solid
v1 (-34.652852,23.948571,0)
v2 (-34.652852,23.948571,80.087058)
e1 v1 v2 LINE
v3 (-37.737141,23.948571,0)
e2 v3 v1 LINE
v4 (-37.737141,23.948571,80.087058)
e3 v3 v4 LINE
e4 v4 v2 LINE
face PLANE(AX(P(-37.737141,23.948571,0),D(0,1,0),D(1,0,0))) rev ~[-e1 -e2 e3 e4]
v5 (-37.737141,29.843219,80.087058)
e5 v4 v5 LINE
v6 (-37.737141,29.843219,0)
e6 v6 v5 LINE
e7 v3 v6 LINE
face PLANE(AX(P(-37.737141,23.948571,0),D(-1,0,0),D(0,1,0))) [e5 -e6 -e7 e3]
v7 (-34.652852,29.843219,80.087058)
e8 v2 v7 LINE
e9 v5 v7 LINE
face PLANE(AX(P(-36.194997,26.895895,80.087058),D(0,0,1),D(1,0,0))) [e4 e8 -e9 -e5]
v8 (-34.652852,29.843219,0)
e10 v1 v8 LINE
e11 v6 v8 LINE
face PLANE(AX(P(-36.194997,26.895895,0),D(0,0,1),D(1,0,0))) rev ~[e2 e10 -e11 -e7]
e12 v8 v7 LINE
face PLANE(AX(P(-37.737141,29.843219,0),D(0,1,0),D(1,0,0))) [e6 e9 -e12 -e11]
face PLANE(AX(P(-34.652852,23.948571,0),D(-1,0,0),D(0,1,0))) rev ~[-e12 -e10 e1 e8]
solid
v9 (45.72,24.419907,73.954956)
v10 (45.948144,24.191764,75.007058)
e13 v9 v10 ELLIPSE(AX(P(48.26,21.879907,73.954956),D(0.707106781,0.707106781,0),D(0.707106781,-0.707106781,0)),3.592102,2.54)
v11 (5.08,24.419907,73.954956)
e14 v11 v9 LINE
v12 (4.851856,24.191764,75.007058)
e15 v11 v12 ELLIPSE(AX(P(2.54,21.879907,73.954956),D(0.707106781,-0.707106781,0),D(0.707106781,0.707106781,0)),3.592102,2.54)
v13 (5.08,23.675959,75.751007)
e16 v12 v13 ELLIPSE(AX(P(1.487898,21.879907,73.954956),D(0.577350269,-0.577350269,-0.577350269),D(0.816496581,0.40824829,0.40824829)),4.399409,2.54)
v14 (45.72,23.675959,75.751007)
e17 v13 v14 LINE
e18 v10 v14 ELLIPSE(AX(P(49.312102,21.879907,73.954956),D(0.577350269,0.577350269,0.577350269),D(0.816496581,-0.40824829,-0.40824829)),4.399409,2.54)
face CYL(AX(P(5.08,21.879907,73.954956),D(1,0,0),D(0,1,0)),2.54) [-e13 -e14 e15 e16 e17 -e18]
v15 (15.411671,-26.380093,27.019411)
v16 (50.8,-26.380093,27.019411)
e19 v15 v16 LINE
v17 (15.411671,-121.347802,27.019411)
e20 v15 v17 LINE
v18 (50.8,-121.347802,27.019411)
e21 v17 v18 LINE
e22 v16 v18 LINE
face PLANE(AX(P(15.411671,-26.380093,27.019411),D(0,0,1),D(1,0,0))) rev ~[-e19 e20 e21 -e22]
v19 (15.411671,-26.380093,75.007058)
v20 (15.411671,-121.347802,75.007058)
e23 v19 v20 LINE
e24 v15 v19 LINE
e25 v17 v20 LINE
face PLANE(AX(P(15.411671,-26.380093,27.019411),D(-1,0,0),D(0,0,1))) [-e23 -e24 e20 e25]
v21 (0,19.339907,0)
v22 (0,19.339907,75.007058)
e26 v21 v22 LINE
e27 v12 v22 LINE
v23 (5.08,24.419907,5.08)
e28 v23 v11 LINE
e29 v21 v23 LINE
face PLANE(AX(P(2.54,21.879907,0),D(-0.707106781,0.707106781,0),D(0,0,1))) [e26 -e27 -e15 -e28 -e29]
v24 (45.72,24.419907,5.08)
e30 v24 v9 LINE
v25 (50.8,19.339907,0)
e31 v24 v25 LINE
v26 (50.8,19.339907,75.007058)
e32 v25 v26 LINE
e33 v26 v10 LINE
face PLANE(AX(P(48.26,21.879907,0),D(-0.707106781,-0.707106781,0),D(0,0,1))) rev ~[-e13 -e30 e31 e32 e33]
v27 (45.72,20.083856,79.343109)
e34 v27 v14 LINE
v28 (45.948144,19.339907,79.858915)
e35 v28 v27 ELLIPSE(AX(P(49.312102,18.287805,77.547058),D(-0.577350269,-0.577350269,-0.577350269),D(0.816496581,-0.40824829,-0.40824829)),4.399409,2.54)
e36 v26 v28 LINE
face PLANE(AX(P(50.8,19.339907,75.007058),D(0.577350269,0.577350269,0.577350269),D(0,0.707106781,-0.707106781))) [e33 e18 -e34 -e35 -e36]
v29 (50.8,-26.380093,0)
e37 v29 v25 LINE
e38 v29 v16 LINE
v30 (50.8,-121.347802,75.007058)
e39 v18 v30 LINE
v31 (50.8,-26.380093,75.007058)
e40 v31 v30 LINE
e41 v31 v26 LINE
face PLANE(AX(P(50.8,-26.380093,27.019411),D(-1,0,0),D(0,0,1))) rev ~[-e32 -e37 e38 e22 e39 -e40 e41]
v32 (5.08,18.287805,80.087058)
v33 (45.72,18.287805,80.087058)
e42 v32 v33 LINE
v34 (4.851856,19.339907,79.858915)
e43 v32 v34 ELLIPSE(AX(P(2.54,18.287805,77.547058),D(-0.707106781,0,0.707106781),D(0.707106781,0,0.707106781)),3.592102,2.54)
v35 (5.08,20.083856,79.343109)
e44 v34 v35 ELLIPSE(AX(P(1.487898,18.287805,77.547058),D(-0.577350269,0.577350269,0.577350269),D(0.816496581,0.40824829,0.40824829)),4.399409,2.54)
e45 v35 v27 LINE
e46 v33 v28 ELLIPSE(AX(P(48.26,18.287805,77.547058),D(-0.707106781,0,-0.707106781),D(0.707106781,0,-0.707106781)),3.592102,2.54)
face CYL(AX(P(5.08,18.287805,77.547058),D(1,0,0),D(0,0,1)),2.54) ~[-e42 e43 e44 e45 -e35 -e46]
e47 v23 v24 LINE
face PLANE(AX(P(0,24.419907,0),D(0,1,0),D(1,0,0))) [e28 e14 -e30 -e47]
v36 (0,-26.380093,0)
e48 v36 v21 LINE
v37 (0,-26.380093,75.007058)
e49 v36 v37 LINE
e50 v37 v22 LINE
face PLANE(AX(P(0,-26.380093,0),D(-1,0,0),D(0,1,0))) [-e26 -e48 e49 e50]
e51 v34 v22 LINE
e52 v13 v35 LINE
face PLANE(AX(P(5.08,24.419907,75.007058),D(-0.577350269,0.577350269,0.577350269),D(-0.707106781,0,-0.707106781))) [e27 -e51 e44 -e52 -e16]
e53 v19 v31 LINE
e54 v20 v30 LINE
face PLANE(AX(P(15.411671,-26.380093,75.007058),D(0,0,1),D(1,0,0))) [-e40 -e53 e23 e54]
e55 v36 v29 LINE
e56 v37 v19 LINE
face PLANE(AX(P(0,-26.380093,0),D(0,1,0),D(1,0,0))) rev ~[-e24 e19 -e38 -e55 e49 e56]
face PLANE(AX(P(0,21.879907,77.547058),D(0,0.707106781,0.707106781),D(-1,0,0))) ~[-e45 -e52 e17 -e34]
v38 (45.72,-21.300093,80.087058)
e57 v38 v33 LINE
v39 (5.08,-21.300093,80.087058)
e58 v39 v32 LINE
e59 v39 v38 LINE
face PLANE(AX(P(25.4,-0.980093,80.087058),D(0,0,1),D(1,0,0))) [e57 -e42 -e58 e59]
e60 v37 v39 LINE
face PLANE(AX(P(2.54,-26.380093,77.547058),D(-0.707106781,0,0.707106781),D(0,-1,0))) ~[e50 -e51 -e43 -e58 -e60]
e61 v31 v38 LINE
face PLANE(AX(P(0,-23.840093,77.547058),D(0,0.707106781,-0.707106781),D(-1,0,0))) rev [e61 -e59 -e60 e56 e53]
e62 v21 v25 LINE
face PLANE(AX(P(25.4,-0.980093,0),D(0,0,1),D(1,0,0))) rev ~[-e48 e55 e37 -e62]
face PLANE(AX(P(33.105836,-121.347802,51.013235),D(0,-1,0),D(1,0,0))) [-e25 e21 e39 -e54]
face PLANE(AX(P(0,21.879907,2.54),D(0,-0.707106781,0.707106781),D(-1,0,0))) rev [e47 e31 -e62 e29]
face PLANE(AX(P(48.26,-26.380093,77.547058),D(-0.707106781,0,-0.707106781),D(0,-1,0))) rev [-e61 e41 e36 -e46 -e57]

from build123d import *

# Parameters (mm, degrees)
F0_W     = 3.0842895067
F0_H     = 5.8946473162
F1_DEPTH = 80.0870582461
F0_W_2   = 50.8
F0_H_2   = 50.8
F2_SIZE  = 5.08
F3_R     = 2.54
F6_W     = 35.3883287489
F6_H     = 47.9876469207
F7_DEPTH = 94.9677098542


# Not quite as in the source:
# - the program builds the solid bodies; features that only make, move or delete a surface that nothing else refers to are left out


with BuildPart() as f1:
    # F0 (on Top) → F1 (new body)
    with BuildSketch(Plane.XY):
        with Locations((-36.1949966816, 26.8958949286)):
            Rectangle(F0_W, F0_H)
    extrude(amount=F1_DEPTH)


with BuildPart() as f1b:
    # F0 (on Top) → F1, piece 2 (new body)
    with BuildSketch(Plane.XY):
        with Locations((25.4, -0.9800925486)):
            Rectangle(F0_W_2, F0_H_2)
    extrude(amount=F1_DEPTH)

    # F2
    f2_edges = [f1b.edges().sort_by_distance(p)[0] for p in [
        (25.4, -26.380093, 80.087058),
        (0, -0.980093, 80.087058),
        (25.4, 24.419907, 80.087058),
        (50.8, -0.980093, 80.087058),
        (0, 24.419907, 40.043529),
        (25.4, 24.419907, 0),
        (50.8, 24.419907, 40.043529),
    ]]
    chamfer(f2_edges, length=F2_SIZE)

    # F3
    f3_edges = [f1b.edges().sort_by_distance(p)[0] for p in [
        (25.4, 19.339907, 80.087058),
        (25.4, 24.419907, 75.007058),
    ]]
    fillet(f3_edges, radius=F3_R)

    # F6 (on face) → F7 (join)
    with BuildSketch(Plane.XZ.offset(26.3800925486)):
        with Locations((33.1058356255, 51.0132347858)):
            Rectangle(F6_W, F6_H)
    extrude(amount=F7_DEPTH)


solid = Compound([f1.part, f1b.part])
